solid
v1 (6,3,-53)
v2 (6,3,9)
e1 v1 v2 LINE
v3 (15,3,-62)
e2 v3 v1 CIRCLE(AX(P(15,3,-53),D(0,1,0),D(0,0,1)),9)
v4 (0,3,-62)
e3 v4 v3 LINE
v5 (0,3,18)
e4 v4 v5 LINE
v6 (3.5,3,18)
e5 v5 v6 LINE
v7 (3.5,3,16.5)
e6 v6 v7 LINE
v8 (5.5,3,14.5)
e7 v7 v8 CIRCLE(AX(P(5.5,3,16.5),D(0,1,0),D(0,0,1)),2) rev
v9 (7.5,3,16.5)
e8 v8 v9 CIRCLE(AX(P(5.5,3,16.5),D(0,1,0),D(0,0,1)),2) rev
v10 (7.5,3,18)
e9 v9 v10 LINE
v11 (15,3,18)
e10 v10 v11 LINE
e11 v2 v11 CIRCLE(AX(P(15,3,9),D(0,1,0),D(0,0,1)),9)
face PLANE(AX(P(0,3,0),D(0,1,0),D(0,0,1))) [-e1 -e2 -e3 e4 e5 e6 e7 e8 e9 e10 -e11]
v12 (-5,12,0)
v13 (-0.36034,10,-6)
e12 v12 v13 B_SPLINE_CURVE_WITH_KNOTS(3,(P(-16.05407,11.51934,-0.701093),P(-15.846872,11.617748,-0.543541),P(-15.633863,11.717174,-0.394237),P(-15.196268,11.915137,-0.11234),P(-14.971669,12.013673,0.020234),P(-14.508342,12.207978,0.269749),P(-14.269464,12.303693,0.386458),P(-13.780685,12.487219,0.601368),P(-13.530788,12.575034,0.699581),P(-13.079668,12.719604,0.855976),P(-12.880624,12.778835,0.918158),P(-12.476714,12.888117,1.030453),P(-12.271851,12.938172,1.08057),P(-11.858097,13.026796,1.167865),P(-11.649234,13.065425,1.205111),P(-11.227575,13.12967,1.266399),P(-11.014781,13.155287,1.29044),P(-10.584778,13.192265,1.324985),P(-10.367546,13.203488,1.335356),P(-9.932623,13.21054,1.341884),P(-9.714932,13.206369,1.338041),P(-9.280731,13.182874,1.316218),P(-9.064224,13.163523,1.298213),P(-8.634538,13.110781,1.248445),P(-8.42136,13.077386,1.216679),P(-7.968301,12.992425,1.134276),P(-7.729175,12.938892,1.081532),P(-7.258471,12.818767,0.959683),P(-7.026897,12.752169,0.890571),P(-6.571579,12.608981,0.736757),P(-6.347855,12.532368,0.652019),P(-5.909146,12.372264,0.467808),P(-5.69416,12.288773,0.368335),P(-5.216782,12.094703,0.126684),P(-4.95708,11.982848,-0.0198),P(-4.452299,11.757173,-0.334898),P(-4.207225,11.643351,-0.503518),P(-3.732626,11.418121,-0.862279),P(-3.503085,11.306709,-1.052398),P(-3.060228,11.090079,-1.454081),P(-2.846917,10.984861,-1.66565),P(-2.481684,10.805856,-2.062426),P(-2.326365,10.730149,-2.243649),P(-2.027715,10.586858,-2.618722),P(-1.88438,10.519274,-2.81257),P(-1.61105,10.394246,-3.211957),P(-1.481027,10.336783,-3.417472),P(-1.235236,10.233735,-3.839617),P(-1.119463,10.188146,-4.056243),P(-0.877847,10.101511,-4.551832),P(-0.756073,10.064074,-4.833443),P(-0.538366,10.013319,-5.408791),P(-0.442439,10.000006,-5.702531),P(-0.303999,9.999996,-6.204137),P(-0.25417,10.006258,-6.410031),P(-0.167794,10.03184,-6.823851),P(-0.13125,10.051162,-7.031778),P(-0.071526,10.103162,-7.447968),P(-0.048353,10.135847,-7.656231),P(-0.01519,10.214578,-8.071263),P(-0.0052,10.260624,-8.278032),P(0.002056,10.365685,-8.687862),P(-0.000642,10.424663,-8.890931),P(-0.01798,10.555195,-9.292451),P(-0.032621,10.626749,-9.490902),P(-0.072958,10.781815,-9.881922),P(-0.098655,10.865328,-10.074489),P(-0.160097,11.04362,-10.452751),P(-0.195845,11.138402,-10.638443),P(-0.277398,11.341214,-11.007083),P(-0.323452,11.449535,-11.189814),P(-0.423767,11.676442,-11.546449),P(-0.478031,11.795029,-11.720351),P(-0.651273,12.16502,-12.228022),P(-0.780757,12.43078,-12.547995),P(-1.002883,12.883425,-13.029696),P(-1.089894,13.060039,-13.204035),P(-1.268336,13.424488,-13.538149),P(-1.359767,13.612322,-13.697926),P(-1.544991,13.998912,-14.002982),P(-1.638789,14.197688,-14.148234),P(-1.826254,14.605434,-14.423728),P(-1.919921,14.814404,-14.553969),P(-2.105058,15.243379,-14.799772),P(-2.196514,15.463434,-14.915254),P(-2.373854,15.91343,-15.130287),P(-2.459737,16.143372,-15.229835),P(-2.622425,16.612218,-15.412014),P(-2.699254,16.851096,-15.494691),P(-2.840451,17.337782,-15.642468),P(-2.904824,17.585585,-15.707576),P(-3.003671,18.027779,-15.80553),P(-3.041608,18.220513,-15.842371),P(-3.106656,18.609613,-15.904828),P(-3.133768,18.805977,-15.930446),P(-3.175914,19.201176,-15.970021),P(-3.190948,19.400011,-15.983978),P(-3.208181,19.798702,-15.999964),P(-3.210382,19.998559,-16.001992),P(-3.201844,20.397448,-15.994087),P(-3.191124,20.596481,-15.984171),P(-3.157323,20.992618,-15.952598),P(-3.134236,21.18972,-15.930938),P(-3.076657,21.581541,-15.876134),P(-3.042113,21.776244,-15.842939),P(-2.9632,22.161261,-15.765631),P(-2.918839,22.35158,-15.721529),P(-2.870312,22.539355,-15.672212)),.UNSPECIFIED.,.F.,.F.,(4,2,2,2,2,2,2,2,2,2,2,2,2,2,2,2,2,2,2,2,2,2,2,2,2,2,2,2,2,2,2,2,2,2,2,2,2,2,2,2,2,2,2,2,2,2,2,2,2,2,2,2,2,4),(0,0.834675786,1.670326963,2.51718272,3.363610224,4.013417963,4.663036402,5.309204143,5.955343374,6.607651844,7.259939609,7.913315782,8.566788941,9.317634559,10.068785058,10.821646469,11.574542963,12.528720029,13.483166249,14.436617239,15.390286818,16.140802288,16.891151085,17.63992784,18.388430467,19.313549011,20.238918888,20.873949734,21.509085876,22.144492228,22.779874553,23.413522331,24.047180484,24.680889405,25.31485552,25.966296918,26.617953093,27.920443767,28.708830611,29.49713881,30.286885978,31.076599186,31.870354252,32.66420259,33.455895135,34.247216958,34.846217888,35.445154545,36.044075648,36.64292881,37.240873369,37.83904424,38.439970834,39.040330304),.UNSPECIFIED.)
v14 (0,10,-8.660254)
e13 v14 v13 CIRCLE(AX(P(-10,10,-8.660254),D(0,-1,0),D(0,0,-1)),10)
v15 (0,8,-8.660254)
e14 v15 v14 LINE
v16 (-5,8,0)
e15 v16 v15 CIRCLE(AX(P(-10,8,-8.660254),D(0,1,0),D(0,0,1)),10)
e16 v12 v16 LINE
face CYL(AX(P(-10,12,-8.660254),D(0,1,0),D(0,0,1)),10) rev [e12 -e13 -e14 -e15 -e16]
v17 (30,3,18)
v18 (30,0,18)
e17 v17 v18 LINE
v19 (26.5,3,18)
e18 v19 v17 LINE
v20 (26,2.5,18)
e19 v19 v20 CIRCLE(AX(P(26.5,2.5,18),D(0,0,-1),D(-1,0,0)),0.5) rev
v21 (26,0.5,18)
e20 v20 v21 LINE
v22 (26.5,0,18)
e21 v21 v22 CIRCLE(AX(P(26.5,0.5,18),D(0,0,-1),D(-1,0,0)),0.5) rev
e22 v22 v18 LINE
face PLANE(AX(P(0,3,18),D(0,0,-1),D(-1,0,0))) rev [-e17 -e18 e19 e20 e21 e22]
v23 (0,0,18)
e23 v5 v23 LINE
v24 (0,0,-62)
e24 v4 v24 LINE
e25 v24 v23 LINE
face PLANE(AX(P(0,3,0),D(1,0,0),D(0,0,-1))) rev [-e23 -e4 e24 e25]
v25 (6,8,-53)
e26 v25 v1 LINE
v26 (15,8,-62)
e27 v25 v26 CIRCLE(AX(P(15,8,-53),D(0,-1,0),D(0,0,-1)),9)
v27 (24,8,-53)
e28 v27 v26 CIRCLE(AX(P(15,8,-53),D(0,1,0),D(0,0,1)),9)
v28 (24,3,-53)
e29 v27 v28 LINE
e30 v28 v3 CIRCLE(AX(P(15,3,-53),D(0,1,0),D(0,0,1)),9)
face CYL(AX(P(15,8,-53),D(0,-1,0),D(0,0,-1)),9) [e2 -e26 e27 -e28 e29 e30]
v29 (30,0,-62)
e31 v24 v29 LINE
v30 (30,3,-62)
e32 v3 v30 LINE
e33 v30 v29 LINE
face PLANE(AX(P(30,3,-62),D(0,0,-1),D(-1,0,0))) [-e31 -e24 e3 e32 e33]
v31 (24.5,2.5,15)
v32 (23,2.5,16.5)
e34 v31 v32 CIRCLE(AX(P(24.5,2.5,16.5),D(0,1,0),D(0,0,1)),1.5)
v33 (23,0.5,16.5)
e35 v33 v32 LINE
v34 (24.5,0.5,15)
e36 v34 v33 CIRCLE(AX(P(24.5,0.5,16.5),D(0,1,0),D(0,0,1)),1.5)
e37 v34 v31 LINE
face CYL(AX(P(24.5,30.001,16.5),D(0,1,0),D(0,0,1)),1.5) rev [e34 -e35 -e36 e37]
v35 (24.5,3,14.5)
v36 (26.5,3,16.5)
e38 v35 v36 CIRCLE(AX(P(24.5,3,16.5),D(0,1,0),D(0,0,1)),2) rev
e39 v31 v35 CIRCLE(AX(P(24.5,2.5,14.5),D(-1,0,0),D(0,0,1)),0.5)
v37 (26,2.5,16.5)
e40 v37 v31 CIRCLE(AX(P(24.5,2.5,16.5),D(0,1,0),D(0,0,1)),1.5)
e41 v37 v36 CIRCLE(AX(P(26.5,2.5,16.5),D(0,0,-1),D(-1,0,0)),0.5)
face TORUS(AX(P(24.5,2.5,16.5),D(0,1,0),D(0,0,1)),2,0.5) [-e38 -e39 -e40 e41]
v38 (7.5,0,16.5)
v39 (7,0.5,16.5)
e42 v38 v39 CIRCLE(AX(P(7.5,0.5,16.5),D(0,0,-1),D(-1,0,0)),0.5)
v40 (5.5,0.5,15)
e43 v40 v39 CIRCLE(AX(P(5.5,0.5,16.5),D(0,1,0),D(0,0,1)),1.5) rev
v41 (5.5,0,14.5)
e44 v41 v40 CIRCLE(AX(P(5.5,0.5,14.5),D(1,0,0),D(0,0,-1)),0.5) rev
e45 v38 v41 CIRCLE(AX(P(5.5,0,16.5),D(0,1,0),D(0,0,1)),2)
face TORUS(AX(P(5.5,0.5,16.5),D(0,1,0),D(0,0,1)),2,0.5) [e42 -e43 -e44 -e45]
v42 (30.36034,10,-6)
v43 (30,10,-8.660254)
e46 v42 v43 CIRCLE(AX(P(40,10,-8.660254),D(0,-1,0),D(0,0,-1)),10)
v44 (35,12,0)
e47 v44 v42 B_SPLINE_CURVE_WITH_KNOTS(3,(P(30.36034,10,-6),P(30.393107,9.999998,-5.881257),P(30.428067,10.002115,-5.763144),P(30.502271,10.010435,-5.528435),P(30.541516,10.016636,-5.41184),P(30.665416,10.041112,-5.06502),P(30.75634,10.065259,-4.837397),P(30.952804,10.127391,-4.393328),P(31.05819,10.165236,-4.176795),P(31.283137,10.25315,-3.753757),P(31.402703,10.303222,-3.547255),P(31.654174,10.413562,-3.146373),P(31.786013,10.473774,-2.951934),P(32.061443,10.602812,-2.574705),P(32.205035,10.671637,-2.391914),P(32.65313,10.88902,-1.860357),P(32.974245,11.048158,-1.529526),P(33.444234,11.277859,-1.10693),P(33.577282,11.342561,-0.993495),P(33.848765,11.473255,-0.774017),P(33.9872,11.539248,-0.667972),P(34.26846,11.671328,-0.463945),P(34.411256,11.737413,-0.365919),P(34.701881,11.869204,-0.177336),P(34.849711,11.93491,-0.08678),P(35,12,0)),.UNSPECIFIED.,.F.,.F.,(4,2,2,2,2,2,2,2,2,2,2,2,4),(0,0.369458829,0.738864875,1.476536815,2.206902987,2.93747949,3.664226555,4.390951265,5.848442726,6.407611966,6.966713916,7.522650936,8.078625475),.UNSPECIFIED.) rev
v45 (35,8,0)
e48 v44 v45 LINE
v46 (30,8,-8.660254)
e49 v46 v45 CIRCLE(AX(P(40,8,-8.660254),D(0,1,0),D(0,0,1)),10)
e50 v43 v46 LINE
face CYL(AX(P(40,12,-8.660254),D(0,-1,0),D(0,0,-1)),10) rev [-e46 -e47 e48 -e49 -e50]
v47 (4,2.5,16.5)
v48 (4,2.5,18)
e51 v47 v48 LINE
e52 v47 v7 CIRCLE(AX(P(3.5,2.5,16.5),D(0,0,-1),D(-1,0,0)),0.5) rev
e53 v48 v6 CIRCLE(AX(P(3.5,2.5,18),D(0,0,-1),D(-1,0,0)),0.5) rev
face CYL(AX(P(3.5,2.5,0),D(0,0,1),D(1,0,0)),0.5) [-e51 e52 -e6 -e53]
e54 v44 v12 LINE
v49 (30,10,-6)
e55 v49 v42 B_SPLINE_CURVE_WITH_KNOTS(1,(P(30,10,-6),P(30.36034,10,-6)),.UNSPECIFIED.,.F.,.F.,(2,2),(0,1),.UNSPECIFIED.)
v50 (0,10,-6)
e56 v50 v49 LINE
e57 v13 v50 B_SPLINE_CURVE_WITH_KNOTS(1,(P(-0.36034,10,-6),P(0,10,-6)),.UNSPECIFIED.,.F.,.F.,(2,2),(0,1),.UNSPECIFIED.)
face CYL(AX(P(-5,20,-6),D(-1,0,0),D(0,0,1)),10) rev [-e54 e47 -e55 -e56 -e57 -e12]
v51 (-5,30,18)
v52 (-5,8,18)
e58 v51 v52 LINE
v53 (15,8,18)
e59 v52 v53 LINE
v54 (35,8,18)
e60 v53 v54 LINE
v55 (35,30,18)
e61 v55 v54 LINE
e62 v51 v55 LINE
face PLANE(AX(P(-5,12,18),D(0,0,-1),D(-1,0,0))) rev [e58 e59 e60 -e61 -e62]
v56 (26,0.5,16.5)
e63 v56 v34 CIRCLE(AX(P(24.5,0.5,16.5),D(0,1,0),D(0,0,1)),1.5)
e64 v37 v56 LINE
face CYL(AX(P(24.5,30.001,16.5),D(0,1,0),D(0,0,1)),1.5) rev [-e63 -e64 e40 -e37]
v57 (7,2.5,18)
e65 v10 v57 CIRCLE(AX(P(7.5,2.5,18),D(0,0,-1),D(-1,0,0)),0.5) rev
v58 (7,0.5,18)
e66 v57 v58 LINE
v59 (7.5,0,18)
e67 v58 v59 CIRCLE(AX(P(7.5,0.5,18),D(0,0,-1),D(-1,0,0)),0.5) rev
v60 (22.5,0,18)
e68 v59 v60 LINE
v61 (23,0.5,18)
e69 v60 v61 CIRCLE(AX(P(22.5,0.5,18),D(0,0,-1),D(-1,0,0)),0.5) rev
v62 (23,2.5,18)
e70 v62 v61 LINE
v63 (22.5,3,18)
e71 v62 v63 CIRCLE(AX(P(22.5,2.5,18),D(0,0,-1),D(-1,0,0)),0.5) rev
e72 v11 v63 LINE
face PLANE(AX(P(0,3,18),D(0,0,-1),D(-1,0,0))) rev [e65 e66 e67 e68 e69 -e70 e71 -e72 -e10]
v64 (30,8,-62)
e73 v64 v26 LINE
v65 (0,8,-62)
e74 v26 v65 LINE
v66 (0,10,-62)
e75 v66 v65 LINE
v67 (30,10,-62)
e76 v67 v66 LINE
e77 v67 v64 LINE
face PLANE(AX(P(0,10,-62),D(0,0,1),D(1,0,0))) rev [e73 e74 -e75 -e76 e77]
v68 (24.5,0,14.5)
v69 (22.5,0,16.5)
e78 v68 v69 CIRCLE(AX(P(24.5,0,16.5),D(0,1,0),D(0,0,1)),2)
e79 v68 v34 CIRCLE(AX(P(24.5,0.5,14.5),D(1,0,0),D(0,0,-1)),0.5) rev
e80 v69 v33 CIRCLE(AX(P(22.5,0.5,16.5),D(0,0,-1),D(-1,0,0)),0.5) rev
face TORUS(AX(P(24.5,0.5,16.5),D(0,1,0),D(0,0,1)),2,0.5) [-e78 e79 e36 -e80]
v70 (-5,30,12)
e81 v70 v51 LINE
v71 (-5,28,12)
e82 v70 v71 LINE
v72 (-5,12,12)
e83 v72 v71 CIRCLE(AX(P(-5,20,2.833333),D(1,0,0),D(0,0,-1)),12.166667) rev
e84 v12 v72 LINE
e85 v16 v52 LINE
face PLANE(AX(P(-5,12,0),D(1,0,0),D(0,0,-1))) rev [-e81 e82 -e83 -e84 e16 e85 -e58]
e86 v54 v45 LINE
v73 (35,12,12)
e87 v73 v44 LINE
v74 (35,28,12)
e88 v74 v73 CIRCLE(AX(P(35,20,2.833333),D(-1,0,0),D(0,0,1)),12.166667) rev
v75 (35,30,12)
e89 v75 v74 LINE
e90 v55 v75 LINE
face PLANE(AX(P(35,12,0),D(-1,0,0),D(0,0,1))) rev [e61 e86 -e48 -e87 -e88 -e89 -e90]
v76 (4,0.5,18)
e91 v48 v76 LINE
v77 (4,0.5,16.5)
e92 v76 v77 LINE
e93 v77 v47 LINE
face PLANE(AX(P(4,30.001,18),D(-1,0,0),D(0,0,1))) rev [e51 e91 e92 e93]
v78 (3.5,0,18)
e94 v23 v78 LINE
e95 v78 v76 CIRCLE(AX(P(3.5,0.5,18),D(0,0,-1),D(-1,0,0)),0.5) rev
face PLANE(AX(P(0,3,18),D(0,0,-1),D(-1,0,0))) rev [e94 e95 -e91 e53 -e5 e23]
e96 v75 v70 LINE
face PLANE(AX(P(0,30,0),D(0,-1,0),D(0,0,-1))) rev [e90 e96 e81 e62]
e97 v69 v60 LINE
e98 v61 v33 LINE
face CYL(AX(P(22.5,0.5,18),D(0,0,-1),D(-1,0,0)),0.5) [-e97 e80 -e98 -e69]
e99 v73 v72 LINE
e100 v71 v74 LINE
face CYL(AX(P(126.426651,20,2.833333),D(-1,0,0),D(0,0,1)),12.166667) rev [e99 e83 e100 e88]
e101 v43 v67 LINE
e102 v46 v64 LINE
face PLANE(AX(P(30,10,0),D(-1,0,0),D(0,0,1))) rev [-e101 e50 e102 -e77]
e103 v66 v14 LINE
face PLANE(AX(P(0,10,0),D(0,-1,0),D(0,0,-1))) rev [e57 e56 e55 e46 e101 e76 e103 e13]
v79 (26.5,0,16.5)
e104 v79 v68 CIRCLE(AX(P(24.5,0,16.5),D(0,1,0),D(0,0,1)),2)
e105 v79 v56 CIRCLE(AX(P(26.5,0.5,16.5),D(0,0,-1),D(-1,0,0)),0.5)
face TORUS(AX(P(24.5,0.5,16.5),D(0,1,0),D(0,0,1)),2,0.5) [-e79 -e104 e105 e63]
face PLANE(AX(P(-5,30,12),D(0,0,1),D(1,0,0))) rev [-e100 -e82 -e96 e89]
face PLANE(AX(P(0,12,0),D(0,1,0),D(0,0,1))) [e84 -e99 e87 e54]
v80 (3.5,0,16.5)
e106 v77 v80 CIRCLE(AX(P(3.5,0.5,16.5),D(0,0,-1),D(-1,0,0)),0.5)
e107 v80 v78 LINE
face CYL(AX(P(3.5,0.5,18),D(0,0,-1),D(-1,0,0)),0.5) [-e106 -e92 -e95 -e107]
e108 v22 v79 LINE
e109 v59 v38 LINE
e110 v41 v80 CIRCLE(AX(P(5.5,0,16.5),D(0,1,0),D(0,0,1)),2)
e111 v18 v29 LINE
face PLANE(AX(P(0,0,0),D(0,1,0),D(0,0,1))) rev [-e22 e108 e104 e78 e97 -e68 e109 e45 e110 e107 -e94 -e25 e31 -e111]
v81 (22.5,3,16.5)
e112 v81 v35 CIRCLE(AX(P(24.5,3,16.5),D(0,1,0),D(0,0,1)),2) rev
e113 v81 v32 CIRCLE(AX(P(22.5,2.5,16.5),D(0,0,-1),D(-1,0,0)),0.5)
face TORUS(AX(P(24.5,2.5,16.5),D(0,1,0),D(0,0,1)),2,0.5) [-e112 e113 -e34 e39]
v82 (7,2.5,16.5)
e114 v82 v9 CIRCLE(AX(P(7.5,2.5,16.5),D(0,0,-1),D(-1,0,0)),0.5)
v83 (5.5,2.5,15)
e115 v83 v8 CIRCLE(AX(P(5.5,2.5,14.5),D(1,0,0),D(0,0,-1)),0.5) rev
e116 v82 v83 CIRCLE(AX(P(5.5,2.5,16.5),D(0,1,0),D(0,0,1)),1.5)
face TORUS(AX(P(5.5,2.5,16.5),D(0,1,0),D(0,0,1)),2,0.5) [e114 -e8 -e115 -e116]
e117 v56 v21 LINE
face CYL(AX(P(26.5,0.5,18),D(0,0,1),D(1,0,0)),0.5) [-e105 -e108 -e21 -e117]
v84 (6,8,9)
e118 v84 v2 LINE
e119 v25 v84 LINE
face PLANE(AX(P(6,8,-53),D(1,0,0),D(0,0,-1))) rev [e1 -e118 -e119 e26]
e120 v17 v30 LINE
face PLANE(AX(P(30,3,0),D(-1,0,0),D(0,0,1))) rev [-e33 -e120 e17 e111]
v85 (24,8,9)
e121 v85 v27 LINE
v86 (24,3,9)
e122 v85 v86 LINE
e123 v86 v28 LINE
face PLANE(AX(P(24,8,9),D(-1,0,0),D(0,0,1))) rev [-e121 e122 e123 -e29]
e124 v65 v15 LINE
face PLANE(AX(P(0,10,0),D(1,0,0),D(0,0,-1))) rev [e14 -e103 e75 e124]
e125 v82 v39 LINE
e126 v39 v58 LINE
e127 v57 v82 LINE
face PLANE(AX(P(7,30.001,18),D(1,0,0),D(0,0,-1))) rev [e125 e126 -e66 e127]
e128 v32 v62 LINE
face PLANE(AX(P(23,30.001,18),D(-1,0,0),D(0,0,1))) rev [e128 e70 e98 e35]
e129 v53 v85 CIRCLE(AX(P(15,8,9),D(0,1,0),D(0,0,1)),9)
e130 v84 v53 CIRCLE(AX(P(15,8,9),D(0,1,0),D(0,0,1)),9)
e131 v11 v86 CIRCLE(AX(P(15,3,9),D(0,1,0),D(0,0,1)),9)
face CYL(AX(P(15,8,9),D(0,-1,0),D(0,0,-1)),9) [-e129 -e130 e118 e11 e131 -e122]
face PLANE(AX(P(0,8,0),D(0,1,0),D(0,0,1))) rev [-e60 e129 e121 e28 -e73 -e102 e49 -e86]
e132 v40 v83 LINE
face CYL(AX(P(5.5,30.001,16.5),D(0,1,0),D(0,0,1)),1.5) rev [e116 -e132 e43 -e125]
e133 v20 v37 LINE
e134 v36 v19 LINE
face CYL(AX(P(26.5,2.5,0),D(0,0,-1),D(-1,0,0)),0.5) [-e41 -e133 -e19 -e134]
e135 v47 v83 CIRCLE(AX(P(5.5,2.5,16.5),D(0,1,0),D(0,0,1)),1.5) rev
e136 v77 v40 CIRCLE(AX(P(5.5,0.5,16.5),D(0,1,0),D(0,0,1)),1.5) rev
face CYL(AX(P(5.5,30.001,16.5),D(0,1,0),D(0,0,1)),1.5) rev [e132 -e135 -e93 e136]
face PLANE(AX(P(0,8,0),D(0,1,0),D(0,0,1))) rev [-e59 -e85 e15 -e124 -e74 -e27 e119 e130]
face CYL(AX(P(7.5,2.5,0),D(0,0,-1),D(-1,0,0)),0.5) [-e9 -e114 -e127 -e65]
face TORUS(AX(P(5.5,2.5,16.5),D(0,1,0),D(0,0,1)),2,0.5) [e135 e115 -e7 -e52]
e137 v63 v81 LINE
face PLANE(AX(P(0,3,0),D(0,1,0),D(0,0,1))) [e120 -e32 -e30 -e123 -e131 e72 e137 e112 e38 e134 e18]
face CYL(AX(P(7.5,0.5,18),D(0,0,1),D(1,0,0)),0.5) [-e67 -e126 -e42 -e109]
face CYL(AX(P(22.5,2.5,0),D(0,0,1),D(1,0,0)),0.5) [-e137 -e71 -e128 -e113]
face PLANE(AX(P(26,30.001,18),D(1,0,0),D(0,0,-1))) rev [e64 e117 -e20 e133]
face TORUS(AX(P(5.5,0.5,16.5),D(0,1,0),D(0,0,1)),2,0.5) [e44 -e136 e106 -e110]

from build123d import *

# Parameters (mm, degrees)
SKETCH2_W                        = 30
SKETCH2_H                        = 18
EXTRUDE_BASE_DEPTH               = 3
SKETCH3_R                        = 9
EXTRUDE_CYLINDER_DEPTH           = 5
SKETCH4_W                        = 40
SKETCH4_H                        = 18
EXTRUDE_PHONE_FLOOR_DEPTH        = 4
SKETCH5_W                        = 40
SKETCH5_H                        = 6
EXTRUDE_PHONE_ROOF_DEPTH         = 18
CUT_PHONE_CRADLE_DEPTH           = 54.141321022
CUT_PHONE_CRADLE_DEPTH_BACK      = 54.141321022
CUT_RUBBER_BAND_HOLDERS_REACH    = 51.487
SKETCH7_W                        = 3
SKETCH7_H                        = 3
FILLET_RUBBER_BAND_HOLDERS_R     = 1.5
FILLET_RUBBER_BAND_HOLDERS_R_2   = 0.5
SKETCH8_W                        = 30
SKETCH8_H                        = 62
EXTRUDE_BASE_EXTENSION_DEPTH     = 3
EXTRUDE_CYLINDER_EXTENSION_DEPTH = 5
SKETCH10_W                       = 30
SKETCH10_H                       = 62
EXTRUDE_FLOOR_EXTENSION_DEPTH    = 2
FILLET1_R                        = 10


# Some blends are built 0.0001 mm under size
with BuildPart() as part:
    # Sketch2 → Extrude-Base (new body)
    with BuildSketch(Plane(origin=(0, 0, 0), x_dir=(1, 0, 0), z_dir=(0, 1, 0))):
        with Locations((15, -9)):
            Rectangle(SKETCH2_W, SKETCH2_H)
    extrude(amount=EXTRUDE_BASE_DEPTH)

    # Sketch3 → Extrude-Cylinder (add)
    with BuildSketch(Plane(origin=(0, 3, 0), x_dir=(1, 0, 0), z_dir=(0, 1, 0))):
        with Locations(Location((15, -9, 0), (0, 0, 270))):
            Circle(SKETCH3_R)
    extrude(amount=EXTRUDE_CYLINDER_DEPTH)

    # Sketch4 → Extrude-Phone Floor (add)
    with BuildSketch(Plane(origin=(0, 8, 0), x_dir=(1, 0, 0), z_dir=(0, 1, 0))):
        with Locations((15, -9)):
            Rectangle(SKETCH4_W, SKETCH4_H)
    extrude(amount=EXTRUDE_PHONE_FLOOR_DEPTH)

    # Sketch5 → Extrude-Phone Roof (add)
    with BuildSketch(Plane(origin=(0, 12, 0), x_dir=(1, 0, 0), z_dir=(0, 1, 0))):
        with Locations((15, -15)):
            Rectangle(SKETCH5_W, SKETCH5_H)
    extrude(amount=EXTRUDE_PHONE_ROOF_DEPTH)

    # Sketch6 → Cut-Phone Cradle (cut, two sides: drawn at the far end of the back side and taken through both)
    with BuildSketch(Plane(origin=(35, 0, 0), x_dir=(0, 0, -1), z_dir=(1, 0, 0)).offset(-CUT_PHONE_CRADLE_DEPTH_BACK)):
        with BuildLine():
            Line((-12, 12), (-12, 28))
            ThreePointArc((-12, 28), (-15, 20), (-12, 12))
        make_face()
    extrude(amount=CUT_PHONE_CRADLE_DEPTH + CUT_PHONE_CRADLE_DEPTH_BACK, mode=Mode.SUBTRACT)

    # Sketch7 → Cut-Rubber Band Holders (cut, up to next)
    with BuildSketch(Plane.XZ, mode=Mode.PRIVATE) as cut_rubber_band_holders_sk1:
        with Locations((24.5, 16.5)):
            Rectangle(SKETCH7_W, SKETCH7_H)
    cut_rubber_band_holders_tool1 = extrude(cut_rubber_band_holders_sk1.sketch, amount=-CUT_RUBBER_BAND_HOLDERS_REACH, mode=Mode.PRIVATE) & part.part
    # Sketch7 → Cut-Rubber Band Holders (cut, up to next)
    with BuildSketch(Plane.XZ, mode=Mode.PRIVATE) as cut_rubber_band_holders_sk2:
        with Locations((5.5, 16.5)):
            Rectangle(SKETCH7_W, SKETCH7_H)
    cut_rubber_band_holders_tool2 = extrude(cut_rubber_band_holders_sk2.sketch, amount=-CUT_RUBBER_BAND_HOLDERS_REACH, mode=Mode.PRIVATE) & part.part
    add(cut_rubber_band_holders_tool1.solids().sort_by_distance((24.5, 0, 16.5))[0], mode=Mode.SUBTRACT)
    add(cut_rubber_band_holders_tool2.solids().sort_by_distance((5.5, 0, 16.5))[0], mode=Mode.SUBTRACT)

    # Fillet-Rubber Band Holders
    fillet_rubber_band_holders_edges = [part.edges().sort_by_distance(p)[0] for p in [
        (26, 1.5, 15),
        (7, 1.5, 15),
        (23, 1.5, 15),
        (4, 1.5, 15),
    ]]
    fillet(fillet_rubber_band_holders_edges, radius=FILLET_RUBBER_BAND_HOLDERS_R - 0.0001)  # a hair under: the kernel refuses the full size
    fillet_rubber_band_holders_2_edges = [part.edges().sort_by_distance(p)[0] for p in [
        (24.5, 3, 15),
        (24.5, 0, 15),
        (5.5, 0, 15),
        (5.5, 3, 15),
        (6.560689461, 3, 15.439310539),
        (4.439310539, 3, 15.439310539),
        (4.439310539, 0, 15.439310539),
        (6.560689461, 0, 15.439310539),
        (23.439310539, 0, 15.439310539),
        (25.560689461, 0, 15.439310539),
        (25.560689461, 3, 15.439310539),
        (23.439310539, 3, 15.439310539),
    ]]
    fillet(fillet_rubber_band_holders_2_edges, radius=FILLET_RUBBER_BAND_HOLDERS_R_2)

    # Sketch8 → Extrude-Base Extension (add)
    with BuildSketch(Plane.XZ):
        with Locations((15, -31)):
            Rectangle(SKETCH8_W, SKETCH8_H)
    extrude(amount=-EXTRUDE_BASE_EXTENSION_DEPTH)

    # Sketch9 → Extrude-Cylinder Extension (add)
    with BuildSketch(Plane(origin=(0, 3, 0), x_dir=(1, 0, 0), z_dir=(0, 1, 0))):
        with BuildLine():
            Line((24, -9), (24, 53))
            ThreePointArc((24, 53), (15, 62), (6, 53))
            Line((6, 53), (6, -9))
            ThreePointArc((6, -9), (15, 0), (24, -9))
        make_face()
    extrude(amount=EXTRUDE_CYLINDER_EXTENSION_DEPTH)

    # Sketch10 → Extrude-Floor Extension (add)
    with BuildSketch(Plane(origin=(0, 8, 0), x_dir=(1, 0, 0), z_dir=(0, 1, 0))):
        with Locations((15, 31)):
            Rectangle(SKETCH10_W, SKETCH10_H)
    extrude(amount=EXTRUDE_FLOOR_EXTENSION_DEPTH)

    # Fillet1
    # the kernel refuses this fillet: 10 mm, written as the material it adds along each edge
    with BuildSketch(Plane(origin=(0, 8, 0), x_dir=(0, 0, -1), z_dir=(0, 1, 0))) as fillet1_piece_1:
        with BuildLine():
            CenterArc((8.660254038, 10), FILLET1_R, 210, 60)
            Line((0, 5), (-0.173205081, 4.9))
            ThreePointArc((-0.173205081, 4.9), (-0.2, 2.5), (-0.2, 0))
            Line((-0.2, 0), (0, -0.2))
            Line((0, -0.2), (8.660254038, -0.2))
            Line((8.660254038, -0.2), (8.660254038, 0))
        make_face()
    extrude(amount=2)
    with BuildSketch(Plane(origin=(0, 10, 0), x_dir=(0, 0, -1), z_dir=(1, 0, 0))) as fillet1_piece_2:
        with BuildLine():
            CenterArc((6, 10), FILLET1_R, 233.130102354, 36.869897646)
            Line((0, 2), (-0.12, 1.84))
            ThreePointArc((-0.12, 1.84), (-0.2, 1), (-0.2, 0))
            Line((-0.2, 0), (0, -0.2))
            Line((0, -0.2), (6, -0.2))
            Line((6, -0.2), (6, 0))
        make_face()
    extrude(amount=30)
    with BuildSketch(Plane(origin=(30, 8, 0), x_dir=(0, 0, -1), z_dir=(0, 1, 0))) as fillet1_piece_3:
        with BuildLine():
            CenterArc((8.660254038, -10), FILLET1_R, 90, 60)
            Line((0, -5), (-0.173205081, -4.9))
            ThreePointArc((-0.173205081, -4.9), (-0.2, -2.5), (-0.2, 0))
            Line((-0.2, 0), (0, 0.2))
            Line((0, 0.2), (8.660254038, 0.2))
            Line((8.660254038, 0.2), (8.660254038, 0))
        make_face()
    extrude(amount=2)
    with BuildSketch(Plane(origin=(-15, 10, 0), x_dir=(0, 0, -1), z_dir=(1, 0, 0))) as fillet1_piece_4a_section:
        with BuildLine():
            CenterArc((6, 10), FILLET1_R, 233.130102354, 36.869897646)
            Line((0, 2), (-0.12, 1.84))
            ThreePointArc((-0.12, 1.84), (-0.2, 1), (-0.2, 0))
            Line((-0.2, 0), (0, -0.2))
            Line((0, -0.2), (6, -0.2))
            Line((6, -0.2), (6, 0))
        make_face()
    fillet1_piece_4a = extrude(amount=45, mode=Mode.PRIVATE)
    fillet1_piece_4a = split(fillet1_piece_4a, bisect_by=Plane(origin=(0, 10.452376795, -1.699345627), z_dir=(-1, 0, 0)), keep=Keep.TOP, mode=Mode.PRIVATE)
    fillet1_piece_4a = split(fillet1_piece_4a, bisect_by=Plane(origin=(-5, 10.452376795, -1.699345627), z_dir=(1, 0, 0)), keep=Keep.TOP, mode=Mode.PRIVATE)
    with BuildSketch(Plane(origin=(0, 8, 0), x_dir=(0, 0, -1), z_dir=(0, 1, 0))) as fillet1_piece_4b_section:
        with BuildLine():
            CenterArc((8.660254038, 10), FILLET1_R, 210, 60)
            Line((0, 5), (-0.173205081, 4.9))
            ThreePointArc((-0.173205081, 4.9), (-0.2, 2.5), (-0.2, 0))
            Line((-0.2, 0), (0, -0.2))
            Line((0, -0.2), (8.660254038, -0.2))
            Line((8.660254038, -0.2), (8.660254038, 0))
        make_face()
    fillet1_piece_4b = extrude(amount=23.650635095, mode=Mode.PRIVATE)
    fillet1_piece_4b = split(fillet1_piece_4b, bisect_by=Plane(origin=(-1.295167111, 10, -2.163104458), z_dir=(0, 1, 0)), keep=Keep.TOP, mode=Mode.PRIVATE)
    fillet1_piece_4b = split(fillet1_piece_4b, bisect_by=Plane(origin=(-1.295167111, 12, -2.163104458), z_dir=(0, -1, 0)), keep=Keep.TOP, mode=Mode.PRIVATE)
    fillet1_piece_4 = fillet1_piece_4a & fillet1_piece_4b
    add(fillet1_piece_4)
    with BuildSketch(Plane(origin=(0, 10, 0), x_dir=(0, 0, -1), z_dir=(1, 0, 0))) as fillet1_piece_5a_section:
        with BuildLine():
            CenterArc((6, 10), FILLET1_R, 233.130102354, 36.869897646)
            Line((0, 2), (-0.12, 1.84))
            ThreePointArc((-0.12, 1.84), (-0.2, 1), (-0.2, 0))
            Line((-0.2, 0), (0, -0.2))
            Line((0, -0.2), (6, -0.2))
            Line((6, -0.2), (6, 0))
        make_face()
    fillet1_piece_5a = extrude(amount=45, mode=Mode.PRIVATE)
    fillet1_piece_5a = split(fillet1_piece_5a, bisect_by=Plane(origin=(30, 10.452376795, -1.699345627), z_dir=(1, 0, 0)), keep=Keep.TOP, mode=Mode.PRIVATE)
    fillet1_piece_5a = split(fillet1_piece_5a, bisect_by=Plane(origin=(35, 10.452376795, -1.699345627), z_dir=(-1, 0, 0)), keep=Keep.TOP, mode=Mode.PRIVATE)
    with BuildSketch(Plane(origin=(30, 8, 0), x_dir=(0, 0, -1), z_dir=(0, 1, 0))) as fillet1_piece_5b_section:
        with BuildLine():
            CenterArc((8.660254038, -10), FILLET1_R, 90, 60)
            Line((0, -5), (-0.173205081, -4.9))
            ThreePointArc((-0.173205081, -4.9), (-0.2, -2.5), (-0.2, 0))
            Line((-0.2, 0), (0, 0.2))
            Line((0, 0.2), (8.660254038, 0.2))
            Line((8.660254038, 0.2), (8.660254038, 0))
        make_face()
    fillet1_piece_5b = extrude(amount=23.650635095, mode=Mode.PRIVATE)
    fillet1_piece_5b = split(fillet1_piece_5b, bisect_by=Plane(origin=(31.295167111, 10, -2.163104458), z_dir=(0, 1, 0)), keep=Keep.TOP, mode=Mode.PRIVATE)
    fillet1_piece_5b = split(fillet1_piece_5b, bisect_by=Plane(origin=(31.295167111, 12, -2.163104458), z_dir=(0, -1, 0)), keep=Keep.TOP, mode=Mode.PRIVATE)
    fillet1_piece_5 = fillet1_piece_5a & fillet1_piece_5b
    add(fillet1_piece_5)


solid = part.part
